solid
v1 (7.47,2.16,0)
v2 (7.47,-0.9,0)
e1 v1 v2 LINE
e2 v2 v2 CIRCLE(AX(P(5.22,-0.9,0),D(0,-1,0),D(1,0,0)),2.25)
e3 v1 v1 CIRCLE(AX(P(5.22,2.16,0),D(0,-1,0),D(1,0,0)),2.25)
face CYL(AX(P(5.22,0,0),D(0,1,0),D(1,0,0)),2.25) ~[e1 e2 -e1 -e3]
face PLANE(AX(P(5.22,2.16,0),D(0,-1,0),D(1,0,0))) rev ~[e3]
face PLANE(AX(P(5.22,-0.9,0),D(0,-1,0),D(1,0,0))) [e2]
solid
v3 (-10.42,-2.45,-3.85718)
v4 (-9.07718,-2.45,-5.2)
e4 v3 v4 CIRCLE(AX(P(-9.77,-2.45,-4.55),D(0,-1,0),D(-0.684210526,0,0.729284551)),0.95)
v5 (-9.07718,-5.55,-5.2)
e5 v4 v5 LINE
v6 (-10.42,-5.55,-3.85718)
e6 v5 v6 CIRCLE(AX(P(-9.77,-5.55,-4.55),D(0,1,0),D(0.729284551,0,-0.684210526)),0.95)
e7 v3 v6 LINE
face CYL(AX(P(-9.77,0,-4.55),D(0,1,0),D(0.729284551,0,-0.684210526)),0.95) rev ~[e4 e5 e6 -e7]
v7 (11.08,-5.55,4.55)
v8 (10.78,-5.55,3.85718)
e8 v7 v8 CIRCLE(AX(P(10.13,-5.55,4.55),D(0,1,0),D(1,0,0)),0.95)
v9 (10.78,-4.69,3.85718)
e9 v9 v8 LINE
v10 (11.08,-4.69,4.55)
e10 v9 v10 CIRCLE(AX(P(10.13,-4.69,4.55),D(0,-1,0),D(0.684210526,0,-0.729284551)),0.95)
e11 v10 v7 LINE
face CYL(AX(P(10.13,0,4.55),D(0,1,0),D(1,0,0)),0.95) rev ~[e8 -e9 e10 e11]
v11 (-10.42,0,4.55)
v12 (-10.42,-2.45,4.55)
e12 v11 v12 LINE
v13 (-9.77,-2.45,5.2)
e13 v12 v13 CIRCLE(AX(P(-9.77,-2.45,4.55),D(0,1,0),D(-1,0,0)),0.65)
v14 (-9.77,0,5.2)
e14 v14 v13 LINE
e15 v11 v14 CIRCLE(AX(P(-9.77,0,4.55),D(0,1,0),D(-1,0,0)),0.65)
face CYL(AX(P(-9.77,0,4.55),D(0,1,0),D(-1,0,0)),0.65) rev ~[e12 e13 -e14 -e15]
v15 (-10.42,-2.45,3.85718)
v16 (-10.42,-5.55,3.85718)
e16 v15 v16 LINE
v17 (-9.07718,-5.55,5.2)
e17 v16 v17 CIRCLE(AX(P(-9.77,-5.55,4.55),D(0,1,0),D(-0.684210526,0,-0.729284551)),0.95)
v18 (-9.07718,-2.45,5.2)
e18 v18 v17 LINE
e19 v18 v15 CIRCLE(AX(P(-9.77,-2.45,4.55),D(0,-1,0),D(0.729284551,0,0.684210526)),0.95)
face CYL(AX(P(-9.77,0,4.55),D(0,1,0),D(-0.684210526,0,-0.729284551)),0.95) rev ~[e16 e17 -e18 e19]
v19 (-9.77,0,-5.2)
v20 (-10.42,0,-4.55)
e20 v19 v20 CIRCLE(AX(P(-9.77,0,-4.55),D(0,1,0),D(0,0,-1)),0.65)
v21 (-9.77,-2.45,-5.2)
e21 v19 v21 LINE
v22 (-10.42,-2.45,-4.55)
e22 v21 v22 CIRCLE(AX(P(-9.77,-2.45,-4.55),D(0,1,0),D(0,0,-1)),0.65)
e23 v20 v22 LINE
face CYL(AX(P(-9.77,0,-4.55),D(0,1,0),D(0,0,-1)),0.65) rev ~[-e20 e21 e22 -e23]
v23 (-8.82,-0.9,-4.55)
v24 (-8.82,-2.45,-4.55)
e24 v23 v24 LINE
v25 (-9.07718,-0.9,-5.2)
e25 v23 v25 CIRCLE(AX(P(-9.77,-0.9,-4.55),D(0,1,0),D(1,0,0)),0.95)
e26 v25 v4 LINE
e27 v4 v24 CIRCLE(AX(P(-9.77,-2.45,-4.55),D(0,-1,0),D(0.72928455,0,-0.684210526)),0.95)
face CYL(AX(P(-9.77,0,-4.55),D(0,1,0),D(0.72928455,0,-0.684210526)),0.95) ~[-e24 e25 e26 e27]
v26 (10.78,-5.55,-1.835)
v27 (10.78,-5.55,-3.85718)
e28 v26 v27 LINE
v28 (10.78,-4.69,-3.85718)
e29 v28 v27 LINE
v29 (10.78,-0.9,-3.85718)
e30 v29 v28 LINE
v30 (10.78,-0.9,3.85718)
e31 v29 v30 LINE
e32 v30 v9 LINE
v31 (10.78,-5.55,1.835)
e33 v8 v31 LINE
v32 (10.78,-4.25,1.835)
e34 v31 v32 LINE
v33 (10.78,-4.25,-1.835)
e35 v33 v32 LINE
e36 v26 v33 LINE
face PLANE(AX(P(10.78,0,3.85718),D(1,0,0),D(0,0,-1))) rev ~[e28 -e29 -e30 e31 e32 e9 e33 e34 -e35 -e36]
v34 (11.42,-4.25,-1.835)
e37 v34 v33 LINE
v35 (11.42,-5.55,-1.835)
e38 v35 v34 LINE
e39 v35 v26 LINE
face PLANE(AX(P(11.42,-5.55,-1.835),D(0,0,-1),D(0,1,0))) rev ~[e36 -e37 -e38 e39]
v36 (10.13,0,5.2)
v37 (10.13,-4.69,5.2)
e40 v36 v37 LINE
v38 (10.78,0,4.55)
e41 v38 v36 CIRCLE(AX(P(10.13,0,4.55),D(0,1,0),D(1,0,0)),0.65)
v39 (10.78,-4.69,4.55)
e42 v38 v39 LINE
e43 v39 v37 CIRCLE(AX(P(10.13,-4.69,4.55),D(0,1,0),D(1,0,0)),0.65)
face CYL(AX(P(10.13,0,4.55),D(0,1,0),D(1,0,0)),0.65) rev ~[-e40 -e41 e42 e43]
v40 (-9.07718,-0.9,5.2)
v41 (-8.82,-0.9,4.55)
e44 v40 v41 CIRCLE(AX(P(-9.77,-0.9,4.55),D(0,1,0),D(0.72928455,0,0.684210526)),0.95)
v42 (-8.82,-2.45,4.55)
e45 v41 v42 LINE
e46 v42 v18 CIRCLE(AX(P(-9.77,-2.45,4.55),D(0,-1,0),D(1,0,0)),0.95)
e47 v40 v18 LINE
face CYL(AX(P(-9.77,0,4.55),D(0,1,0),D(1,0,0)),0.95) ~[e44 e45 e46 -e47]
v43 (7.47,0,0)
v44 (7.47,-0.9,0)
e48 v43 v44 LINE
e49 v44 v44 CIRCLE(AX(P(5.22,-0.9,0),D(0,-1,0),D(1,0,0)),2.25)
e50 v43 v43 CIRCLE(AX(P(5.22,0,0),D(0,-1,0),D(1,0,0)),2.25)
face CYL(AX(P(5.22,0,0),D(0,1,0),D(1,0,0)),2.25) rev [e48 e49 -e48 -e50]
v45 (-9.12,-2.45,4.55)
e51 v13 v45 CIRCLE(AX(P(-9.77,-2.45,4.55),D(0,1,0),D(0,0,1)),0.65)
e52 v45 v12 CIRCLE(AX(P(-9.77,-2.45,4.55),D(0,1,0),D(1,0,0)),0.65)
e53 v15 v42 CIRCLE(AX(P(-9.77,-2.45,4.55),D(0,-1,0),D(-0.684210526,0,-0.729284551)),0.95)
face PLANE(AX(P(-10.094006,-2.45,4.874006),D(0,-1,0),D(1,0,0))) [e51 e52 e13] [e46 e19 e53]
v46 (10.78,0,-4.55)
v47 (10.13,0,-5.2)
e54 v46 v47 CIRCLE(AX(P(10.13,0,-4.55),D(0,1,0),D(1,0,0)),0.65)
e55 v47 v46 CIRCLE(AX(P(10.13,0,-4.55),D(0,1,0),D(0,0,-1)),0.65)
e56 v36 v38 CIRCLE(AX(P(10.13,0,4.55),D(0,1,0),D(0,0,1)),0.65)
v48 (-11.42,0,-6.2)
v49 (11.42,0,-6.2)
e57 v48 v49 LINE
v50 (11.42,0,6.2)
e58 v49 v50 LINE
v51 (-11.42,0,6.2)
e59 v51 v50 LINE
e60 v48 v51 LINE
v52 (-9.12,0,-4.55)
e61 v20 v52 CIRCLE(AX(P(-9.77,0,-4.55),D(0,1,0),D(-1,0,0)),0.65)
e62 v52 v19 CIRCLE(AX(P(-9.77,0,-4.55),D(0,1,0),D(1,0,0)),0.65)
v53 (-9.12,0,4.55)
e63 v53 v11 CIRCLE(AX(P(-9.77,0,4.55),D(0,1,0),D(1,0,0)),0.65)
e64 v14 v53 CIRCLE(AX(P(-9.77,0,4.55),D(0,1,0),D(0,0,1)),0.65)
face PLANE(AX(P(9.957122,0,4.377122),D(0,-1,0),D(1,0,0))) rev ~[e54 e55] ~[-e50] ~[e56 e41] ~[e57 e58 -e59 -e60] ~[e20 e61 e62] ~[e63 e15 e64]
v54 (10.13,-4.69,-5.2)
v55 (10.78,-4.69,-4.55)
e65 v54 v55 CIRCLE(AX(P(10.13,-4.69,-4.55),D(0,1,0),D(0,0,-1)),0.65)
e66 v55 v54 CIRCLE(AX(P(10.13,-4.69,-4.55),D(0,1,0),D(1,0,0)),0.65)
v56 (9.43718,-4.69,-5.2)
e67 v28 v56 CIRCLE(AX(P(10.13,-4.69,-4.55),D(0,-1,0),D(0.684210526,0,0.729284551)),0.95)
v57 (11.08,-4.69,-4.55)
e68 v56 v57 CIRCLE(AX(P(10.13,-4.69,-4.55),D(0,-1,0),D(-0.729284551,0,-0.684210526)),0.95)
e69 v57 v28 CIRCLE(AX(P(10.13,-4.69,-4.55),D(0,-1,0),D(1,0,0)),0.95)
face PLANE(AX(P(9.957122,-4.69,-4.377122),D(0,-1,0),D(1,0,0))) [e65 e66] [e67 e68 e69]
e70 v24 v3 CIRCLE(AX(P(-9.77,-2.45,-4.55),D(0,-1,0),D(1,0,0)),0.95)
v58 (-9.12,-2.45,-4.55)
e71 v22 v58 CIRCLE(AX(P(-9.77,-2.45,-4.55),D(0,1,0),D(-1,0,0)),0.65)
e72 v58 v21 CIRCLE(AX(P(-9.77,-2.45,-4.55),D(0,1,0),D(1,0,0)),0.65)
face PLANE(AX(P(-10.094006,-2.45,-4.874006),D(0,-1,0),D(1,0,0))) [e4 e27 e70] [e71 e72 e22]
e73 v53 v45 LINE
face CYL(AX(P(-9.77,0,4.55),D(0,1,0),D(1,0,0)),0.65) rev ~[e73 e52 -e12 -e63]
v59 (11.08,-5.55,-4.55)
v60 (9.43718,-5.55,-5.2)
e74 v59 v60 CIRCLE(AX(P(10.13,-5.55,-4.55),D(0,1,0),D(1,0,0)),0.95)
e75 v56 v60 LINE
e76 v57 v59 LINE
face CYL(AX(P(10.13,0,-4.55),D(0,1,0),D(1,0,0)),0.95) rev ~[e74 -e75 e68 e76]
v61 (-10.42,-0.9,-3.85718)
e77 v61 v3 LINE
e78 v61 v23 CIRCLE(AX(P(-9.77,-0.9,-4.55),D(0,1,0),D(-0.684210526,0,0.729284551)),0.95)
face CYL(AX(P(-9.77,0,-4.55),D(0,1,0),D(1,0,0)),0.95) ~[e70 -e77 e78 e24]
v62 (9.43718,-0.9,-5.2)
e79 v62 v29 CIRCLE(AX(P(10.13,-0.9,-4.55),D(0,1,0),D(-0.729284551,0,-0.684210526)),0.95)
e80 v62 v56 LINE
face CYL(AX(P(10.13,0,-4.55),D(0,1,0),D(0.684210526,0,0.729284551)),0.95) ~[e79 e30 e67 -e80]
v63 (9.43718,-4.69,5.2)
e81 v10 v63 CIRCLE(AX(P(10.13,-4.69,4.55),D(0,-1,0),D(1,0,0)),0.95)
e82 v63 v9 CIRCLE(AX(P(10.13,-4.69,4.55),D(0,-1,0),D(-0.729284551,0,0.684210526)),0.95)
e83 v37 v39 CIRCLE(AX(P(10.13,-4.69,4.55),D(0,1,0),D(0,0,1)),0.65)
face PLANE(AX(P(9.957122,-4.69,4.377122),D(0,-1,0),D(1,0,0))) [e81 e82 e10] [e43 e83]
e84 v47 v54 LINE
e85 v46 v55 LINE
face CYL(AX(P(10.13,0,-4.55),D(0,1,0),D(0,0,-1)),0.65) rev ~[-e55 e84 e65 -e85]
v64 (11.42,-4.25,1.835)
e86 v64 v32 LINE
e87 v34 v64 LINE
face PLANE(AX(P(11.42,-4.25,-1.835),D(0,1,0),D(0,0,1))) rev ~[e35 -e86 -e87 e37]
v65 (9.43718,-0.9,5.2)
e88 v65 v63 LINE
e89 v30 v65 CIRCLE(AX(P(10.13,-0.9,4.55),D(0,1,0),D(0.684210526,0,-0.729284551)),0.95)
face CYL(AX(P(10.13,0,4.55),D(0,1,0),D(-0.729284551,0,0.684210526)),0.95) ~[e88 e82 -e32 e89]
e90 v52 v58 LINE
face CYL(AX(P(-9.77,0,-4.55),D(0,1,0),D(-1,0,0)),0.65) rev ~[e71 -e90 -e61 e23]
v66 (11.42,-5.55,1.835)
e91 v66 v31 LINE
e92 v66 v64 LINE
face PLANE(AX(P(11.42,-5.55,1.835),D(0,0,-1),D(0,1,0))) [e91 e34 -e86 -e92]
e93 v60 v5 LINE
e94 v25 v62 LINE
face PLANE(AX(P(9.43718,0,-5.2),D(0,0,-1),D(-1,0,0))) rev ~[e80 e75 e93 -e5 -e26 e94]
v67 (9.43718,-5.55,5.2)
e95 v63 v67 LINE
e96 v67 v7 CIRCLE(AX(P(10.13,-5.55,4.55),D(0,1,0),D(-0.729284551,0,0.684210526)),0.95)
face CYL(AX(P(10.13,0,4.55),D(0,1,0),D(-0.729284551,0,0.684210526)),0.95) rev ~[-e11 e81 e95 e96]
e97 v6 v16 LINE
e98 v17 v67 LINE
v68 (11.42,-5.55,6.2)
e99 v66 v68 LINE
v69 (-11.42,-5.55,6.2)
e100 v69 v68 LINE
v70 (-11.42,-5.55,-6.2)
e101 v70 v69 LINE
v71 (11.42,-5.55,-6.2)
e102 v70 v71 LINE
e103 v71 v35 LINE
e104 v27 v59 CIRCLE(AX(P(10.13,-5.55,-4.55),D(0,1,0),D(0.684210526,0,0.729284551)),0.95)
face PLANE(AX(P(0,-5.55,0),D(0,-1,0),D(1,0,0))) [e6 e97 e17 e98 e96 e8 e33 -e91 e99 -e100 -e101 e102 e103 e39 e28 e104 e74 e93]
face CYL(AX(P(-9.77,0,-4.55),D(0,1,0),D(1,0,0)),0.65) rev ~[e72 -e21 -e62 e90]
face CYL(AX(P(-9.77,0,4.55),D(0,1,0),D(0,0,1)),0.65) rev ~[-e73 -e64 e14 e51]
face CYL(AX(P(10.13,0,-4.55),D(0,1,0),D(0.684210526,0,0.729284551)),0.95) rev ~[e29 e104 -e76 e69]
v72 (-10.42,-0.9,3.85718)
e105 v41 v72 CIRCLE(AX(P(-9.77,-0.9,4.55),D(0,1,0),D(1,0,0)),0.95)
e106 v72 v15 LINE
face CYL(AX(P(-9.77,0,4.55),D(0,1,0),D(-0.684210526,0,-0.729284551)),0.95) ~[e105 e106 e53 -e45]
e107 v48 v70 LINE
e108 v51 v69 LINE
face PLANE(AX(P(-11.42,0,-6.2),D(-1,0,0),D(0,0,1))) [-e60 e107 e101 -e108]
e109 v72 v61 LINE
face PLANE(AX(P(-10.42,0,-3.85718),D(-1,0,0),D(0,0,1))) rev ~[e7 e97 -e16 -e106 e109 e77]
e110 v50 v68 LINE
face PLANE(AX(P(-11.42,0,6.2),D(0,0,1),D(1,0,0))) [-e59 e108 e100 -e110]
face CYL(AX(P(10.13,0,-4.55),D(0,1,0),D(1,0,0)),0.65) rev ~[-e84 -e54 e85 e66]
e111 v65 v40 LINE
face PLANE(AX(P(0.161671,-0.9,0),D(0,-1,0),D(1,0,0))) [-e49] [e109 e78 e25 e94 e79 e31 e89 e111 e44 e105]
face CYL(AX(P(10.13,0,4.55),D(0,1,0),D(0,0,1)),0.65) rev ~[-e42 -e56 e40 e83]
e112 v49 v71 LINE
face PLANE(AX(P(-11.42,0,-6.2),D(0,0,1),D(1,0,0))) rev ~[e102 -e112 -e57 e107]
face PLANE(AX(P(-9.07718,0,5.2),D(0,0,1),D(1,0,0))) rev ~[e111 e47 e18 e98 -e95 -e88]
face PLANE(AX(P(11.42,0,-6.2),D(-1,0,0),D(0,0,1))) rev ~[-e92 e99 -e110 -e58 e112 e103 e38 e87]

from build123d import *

# Parameters (mm, degrees)
F0_W     = 22.84
F0_H     = 12.4
F1_DEPTH = 5.55
F0_R     = 2.25
F2_DEPTH = 0.9
F3_DEPTH = 4.69
F4_DEPTH = 2.45
F5_W     = 1.3
F5_H     = 3.67
F6_DEPTH = 1
F7_DEPTH = 0.9
F8_DEPTH = 3.06


# Not quite as in the source:
# - a feature names something its author has since deleted; it is built from what else it names


with BuildPart() as f1:
    # F0 (on Front) → F1 (new body)
    with BuildSketch(Plane.XZ):
        Rectangle(F0_W, F0_H)
        with BuildLine():
            ThreePointArc((11.08, 4.55), (11.0017797887, 4.1725082782), (10.78, 3.857179677))
            Line((10.78, 3.857179677), (10.78, -3.857179677))
            ThreePointArc((10.78, -3.857179677), (11.0017797887, -4.1725082782), (11.08, -4.55))
            ThreePointArc((11.08, -4.55), (10.479514444, -5.4333683566), (9.437179677, -5.2))
            Line((9.437179677, -5.2), (-9.077179677, -5.2))
            ThreePointArc((-9.077179677, -5.2), (-10.4417514421, -5.2217514421), (-10.42, -3.857179677))
            Line((-10.42, -3.857179677), (-10.42, 3.857179677))
            ThreePointArc((-10.42, 3.857179677), (-10.4417514421, 5.2217514421), (-9.077179677, 5.2))
            Line((-9.077179677, 5.2), (9.437179677, 5.2))
            ThreePointArc((9.437179677, 5.2), (10.479514444, 5.4333683566), (11.08, 4.55))
        make_face(mode=Mode.SUBTRACT)
    extrude(amount=F1_DEPTH)

    # F0 (on Front) → F2 (join)
    with BuildSketch(Plane.XZ):
        with BuildLine():
            Line((10.78, -3.857179677), (10.78, 3.857179677))
            ThreePointArc((10.78, 3.857179677), (9.4582485579, 3.8782485579), (9.437179677, 5.2))
            Line((9.437179677, 5.2), (-9.077179677, 5.2))
            ThreePointArc((-9.077179677, 5.2), (-8.8866316434, 4.899514444), (-8.82, 4.55))
            ThreePointArc((-8.82, 4.55), (-9.3925082782, 3.6782202113), (-10.42, 3.857179677))
            Line((-10.42, 3.857179677), (-10.42, -3.857179677))
            ThreePointArc((-10.42, -3.857179677), (-9.3925082782, -3.6782202113), (-8.82, -4.55))
            ThreePointArc((-8.82, -4.55), (-8.8866316434, -4.899514444), (-9.077179677, -5.2))
            Line((-9.077179677, -5.2), (9.437179677, -5.2))
            ThreePointArc((9.437179677, -5.2), (9.4582485579, -3.8782485579), (10.78, -3.857179677))
        make_face()
        with Locations((5.22, 0)):
            Circle(F0_R, mode=Mode.SUBTRACT)
    extrude(amount=F2_DEPTH)

    # F0 (on Front) → F3 (join)
    with BuildSketch(Plane.XZ):
        with BuildLine():
            Line((10.78, 3.857179677), (10.78, 4.55))
            ThreePointArc((10.78, 4.55), (9.6703805922, 4.0903805922), (10.13, 5.2))
            Line((10.13, 5.2), (9.437179677, 5.2))
            ThreePointArc((9.437179677, 5.2), (9.4582485579, 3.8782485579), (10.78, 3.857179677))
        make_face()
        with BuildLine():
            ThreePointArc((10.13, 5.2), (10.5896194078, 5.0096194078), (10.78, 4.55))
            Line((10.78, 4.55), (10.78, 3.857179677))
            ThreePointArc((10.78, 3.857179677), (11.0017797887, 4.1725082782), (11.08, 4.55))
            ThreePointArc((11.08, 4.55), (10.479514444, 5.4333683566), (9.437179677, 5.2))
            Line((9.437179677, 5.2), (10.13, 5.2))
        make_face()
        with BuildLine():
            Line((10.78, -4.55), (10.78, -3.857179677))
            ThreePointArc((10.78, -3.857179677), (9.4582485579, -3.8782485579), (9.437179677, -5.2))
            Line((9.437179677, -5.2), (10.13, -5.2))
            ThreePointArc((10.13, -5.2), (9.6703805922, -4.0903805922), (10.78, -4.55))
        make_face()
        with BuildLine():
            ThreePointArc((11.08, -4.55), (11.0017797887, -4.1725082782), (10.78, -3.857179677))
            Line((10.78, -3.857179677), (10.78, -4.55))
            ThreePointArc((10.78, -4.55), (10.5896194078, -5.0096194078), (10.13, -5.2))
            Line((10.13, -5.2), (9.437179677, -5.2))
            ThreePointArc((9.437179677, -5.2), (10.479514444, -5.4333683566), (11.08, -4.55))
        make_face()
    extrude(amount=F3_DEPTH)

    # F0 (on Front) → F4 (join)
    with BuildSketch(Plane.XZ):
        with BuildLine():
            Line((-9.77, 5.2), (-9.077179677, 5.2))
            ThreePointArc((-9.077179677, 5.2), (-10.4417514421, 5.2217514421), (-10.42, 3.857179677))
            Line((-10.42, 3.857179677), (-10.42, 4.55))
            ThreePointArc((-10.42, 4.55), (-10.2296194078, 5.0096194078), (-9.77, 5.2))
        make_face()
        with BuildLine():
            ThreePointArc((-8.82, 4.55), (-8.8866316434, 4.899514444), (-9.077179677, 5.2))
            Line((-9.077179677, 5.2), (-9.77, 5.2))
            ThreePointArc((-9.77, 5.2), (-9.3103805922, 5.0096194078), (-9.12, 4.55))
            ThreePointArc((-9.12, 4.55), (-9.77, 3.9), (-10.42, 4.55))
            Line((-10.42, 4.55), (-10.42, 3.857179677))
            ThreePointArc((-10.42, 3.857179677), (-9.3925082782, 3.6782202113), (-8.82, 4.55))
        make_face()
        with BuildLine():
            ThreePointArc((-10.42, -3.857179677), (-10.4417514421, -5.2217514421), (-9.077179677, -5.2))
            Line((-9.077179677, -5.2), (-9.77, -5.2))
            ThreePointArc((-9.77, -5.2), (-10.2296194078, -5.0096194078), (-10.42, -4.55))
            Line((-10.42, -4.55), (-10.42, -3.857179677))
        make_face()
        with BuildLine():
            Line((-9.77, -5.2), (-9.077179677, -5.2))
            ThreePointArc((-9.077179677, -5.2), (-8.8866316434, -4.899514444), (-8.82, -4.55))
            ThreePointArc((-8.82, -4.55), (-9.3925082782, -3.6782202113), (-10.42, -3.857179677))
            Line((-10.42, -3.857179677), (-10.42, -4.55))
            ThreePointArc((-10.42, -4.55), (-9.77, -3.9), (-9.12, -4.55))
            ThreePointArc((-9.12, -4.55), (-9.3103805922, -5.0096194078), (-9.77, -5.2))
        make_face()
    extrude(amount=F4_DEPTH)

    # F5 (on face) → F6 (cut)
    with BuildSketch(Plane.YZ.offset(11.42)):
        with Locations((-4.9, 0)):
            Rectangle(F5_W, F5_H)
    extrude(amount=-F6_DEPTH, mode=Mode.SUBTRACT)


with BuildPart() as f7:
    # F0 (on Front) → F7 (new body)
    with BuildSketch(Plane.XZ):
        with Locations((5.22, 0)):
            Circle(F0_R)
    extrude(amount=F7_DEPTH)

    # F8 (add): a face of the model
    f8_faces = [f7.faces().sort_by_distance(p)[0] for p in [
        (5.22, -0.9, 0),
    ]]
    extrude(f8_faces, amount=-F8_DEPTH)


solid = Compound([f1.part, f7.part])
